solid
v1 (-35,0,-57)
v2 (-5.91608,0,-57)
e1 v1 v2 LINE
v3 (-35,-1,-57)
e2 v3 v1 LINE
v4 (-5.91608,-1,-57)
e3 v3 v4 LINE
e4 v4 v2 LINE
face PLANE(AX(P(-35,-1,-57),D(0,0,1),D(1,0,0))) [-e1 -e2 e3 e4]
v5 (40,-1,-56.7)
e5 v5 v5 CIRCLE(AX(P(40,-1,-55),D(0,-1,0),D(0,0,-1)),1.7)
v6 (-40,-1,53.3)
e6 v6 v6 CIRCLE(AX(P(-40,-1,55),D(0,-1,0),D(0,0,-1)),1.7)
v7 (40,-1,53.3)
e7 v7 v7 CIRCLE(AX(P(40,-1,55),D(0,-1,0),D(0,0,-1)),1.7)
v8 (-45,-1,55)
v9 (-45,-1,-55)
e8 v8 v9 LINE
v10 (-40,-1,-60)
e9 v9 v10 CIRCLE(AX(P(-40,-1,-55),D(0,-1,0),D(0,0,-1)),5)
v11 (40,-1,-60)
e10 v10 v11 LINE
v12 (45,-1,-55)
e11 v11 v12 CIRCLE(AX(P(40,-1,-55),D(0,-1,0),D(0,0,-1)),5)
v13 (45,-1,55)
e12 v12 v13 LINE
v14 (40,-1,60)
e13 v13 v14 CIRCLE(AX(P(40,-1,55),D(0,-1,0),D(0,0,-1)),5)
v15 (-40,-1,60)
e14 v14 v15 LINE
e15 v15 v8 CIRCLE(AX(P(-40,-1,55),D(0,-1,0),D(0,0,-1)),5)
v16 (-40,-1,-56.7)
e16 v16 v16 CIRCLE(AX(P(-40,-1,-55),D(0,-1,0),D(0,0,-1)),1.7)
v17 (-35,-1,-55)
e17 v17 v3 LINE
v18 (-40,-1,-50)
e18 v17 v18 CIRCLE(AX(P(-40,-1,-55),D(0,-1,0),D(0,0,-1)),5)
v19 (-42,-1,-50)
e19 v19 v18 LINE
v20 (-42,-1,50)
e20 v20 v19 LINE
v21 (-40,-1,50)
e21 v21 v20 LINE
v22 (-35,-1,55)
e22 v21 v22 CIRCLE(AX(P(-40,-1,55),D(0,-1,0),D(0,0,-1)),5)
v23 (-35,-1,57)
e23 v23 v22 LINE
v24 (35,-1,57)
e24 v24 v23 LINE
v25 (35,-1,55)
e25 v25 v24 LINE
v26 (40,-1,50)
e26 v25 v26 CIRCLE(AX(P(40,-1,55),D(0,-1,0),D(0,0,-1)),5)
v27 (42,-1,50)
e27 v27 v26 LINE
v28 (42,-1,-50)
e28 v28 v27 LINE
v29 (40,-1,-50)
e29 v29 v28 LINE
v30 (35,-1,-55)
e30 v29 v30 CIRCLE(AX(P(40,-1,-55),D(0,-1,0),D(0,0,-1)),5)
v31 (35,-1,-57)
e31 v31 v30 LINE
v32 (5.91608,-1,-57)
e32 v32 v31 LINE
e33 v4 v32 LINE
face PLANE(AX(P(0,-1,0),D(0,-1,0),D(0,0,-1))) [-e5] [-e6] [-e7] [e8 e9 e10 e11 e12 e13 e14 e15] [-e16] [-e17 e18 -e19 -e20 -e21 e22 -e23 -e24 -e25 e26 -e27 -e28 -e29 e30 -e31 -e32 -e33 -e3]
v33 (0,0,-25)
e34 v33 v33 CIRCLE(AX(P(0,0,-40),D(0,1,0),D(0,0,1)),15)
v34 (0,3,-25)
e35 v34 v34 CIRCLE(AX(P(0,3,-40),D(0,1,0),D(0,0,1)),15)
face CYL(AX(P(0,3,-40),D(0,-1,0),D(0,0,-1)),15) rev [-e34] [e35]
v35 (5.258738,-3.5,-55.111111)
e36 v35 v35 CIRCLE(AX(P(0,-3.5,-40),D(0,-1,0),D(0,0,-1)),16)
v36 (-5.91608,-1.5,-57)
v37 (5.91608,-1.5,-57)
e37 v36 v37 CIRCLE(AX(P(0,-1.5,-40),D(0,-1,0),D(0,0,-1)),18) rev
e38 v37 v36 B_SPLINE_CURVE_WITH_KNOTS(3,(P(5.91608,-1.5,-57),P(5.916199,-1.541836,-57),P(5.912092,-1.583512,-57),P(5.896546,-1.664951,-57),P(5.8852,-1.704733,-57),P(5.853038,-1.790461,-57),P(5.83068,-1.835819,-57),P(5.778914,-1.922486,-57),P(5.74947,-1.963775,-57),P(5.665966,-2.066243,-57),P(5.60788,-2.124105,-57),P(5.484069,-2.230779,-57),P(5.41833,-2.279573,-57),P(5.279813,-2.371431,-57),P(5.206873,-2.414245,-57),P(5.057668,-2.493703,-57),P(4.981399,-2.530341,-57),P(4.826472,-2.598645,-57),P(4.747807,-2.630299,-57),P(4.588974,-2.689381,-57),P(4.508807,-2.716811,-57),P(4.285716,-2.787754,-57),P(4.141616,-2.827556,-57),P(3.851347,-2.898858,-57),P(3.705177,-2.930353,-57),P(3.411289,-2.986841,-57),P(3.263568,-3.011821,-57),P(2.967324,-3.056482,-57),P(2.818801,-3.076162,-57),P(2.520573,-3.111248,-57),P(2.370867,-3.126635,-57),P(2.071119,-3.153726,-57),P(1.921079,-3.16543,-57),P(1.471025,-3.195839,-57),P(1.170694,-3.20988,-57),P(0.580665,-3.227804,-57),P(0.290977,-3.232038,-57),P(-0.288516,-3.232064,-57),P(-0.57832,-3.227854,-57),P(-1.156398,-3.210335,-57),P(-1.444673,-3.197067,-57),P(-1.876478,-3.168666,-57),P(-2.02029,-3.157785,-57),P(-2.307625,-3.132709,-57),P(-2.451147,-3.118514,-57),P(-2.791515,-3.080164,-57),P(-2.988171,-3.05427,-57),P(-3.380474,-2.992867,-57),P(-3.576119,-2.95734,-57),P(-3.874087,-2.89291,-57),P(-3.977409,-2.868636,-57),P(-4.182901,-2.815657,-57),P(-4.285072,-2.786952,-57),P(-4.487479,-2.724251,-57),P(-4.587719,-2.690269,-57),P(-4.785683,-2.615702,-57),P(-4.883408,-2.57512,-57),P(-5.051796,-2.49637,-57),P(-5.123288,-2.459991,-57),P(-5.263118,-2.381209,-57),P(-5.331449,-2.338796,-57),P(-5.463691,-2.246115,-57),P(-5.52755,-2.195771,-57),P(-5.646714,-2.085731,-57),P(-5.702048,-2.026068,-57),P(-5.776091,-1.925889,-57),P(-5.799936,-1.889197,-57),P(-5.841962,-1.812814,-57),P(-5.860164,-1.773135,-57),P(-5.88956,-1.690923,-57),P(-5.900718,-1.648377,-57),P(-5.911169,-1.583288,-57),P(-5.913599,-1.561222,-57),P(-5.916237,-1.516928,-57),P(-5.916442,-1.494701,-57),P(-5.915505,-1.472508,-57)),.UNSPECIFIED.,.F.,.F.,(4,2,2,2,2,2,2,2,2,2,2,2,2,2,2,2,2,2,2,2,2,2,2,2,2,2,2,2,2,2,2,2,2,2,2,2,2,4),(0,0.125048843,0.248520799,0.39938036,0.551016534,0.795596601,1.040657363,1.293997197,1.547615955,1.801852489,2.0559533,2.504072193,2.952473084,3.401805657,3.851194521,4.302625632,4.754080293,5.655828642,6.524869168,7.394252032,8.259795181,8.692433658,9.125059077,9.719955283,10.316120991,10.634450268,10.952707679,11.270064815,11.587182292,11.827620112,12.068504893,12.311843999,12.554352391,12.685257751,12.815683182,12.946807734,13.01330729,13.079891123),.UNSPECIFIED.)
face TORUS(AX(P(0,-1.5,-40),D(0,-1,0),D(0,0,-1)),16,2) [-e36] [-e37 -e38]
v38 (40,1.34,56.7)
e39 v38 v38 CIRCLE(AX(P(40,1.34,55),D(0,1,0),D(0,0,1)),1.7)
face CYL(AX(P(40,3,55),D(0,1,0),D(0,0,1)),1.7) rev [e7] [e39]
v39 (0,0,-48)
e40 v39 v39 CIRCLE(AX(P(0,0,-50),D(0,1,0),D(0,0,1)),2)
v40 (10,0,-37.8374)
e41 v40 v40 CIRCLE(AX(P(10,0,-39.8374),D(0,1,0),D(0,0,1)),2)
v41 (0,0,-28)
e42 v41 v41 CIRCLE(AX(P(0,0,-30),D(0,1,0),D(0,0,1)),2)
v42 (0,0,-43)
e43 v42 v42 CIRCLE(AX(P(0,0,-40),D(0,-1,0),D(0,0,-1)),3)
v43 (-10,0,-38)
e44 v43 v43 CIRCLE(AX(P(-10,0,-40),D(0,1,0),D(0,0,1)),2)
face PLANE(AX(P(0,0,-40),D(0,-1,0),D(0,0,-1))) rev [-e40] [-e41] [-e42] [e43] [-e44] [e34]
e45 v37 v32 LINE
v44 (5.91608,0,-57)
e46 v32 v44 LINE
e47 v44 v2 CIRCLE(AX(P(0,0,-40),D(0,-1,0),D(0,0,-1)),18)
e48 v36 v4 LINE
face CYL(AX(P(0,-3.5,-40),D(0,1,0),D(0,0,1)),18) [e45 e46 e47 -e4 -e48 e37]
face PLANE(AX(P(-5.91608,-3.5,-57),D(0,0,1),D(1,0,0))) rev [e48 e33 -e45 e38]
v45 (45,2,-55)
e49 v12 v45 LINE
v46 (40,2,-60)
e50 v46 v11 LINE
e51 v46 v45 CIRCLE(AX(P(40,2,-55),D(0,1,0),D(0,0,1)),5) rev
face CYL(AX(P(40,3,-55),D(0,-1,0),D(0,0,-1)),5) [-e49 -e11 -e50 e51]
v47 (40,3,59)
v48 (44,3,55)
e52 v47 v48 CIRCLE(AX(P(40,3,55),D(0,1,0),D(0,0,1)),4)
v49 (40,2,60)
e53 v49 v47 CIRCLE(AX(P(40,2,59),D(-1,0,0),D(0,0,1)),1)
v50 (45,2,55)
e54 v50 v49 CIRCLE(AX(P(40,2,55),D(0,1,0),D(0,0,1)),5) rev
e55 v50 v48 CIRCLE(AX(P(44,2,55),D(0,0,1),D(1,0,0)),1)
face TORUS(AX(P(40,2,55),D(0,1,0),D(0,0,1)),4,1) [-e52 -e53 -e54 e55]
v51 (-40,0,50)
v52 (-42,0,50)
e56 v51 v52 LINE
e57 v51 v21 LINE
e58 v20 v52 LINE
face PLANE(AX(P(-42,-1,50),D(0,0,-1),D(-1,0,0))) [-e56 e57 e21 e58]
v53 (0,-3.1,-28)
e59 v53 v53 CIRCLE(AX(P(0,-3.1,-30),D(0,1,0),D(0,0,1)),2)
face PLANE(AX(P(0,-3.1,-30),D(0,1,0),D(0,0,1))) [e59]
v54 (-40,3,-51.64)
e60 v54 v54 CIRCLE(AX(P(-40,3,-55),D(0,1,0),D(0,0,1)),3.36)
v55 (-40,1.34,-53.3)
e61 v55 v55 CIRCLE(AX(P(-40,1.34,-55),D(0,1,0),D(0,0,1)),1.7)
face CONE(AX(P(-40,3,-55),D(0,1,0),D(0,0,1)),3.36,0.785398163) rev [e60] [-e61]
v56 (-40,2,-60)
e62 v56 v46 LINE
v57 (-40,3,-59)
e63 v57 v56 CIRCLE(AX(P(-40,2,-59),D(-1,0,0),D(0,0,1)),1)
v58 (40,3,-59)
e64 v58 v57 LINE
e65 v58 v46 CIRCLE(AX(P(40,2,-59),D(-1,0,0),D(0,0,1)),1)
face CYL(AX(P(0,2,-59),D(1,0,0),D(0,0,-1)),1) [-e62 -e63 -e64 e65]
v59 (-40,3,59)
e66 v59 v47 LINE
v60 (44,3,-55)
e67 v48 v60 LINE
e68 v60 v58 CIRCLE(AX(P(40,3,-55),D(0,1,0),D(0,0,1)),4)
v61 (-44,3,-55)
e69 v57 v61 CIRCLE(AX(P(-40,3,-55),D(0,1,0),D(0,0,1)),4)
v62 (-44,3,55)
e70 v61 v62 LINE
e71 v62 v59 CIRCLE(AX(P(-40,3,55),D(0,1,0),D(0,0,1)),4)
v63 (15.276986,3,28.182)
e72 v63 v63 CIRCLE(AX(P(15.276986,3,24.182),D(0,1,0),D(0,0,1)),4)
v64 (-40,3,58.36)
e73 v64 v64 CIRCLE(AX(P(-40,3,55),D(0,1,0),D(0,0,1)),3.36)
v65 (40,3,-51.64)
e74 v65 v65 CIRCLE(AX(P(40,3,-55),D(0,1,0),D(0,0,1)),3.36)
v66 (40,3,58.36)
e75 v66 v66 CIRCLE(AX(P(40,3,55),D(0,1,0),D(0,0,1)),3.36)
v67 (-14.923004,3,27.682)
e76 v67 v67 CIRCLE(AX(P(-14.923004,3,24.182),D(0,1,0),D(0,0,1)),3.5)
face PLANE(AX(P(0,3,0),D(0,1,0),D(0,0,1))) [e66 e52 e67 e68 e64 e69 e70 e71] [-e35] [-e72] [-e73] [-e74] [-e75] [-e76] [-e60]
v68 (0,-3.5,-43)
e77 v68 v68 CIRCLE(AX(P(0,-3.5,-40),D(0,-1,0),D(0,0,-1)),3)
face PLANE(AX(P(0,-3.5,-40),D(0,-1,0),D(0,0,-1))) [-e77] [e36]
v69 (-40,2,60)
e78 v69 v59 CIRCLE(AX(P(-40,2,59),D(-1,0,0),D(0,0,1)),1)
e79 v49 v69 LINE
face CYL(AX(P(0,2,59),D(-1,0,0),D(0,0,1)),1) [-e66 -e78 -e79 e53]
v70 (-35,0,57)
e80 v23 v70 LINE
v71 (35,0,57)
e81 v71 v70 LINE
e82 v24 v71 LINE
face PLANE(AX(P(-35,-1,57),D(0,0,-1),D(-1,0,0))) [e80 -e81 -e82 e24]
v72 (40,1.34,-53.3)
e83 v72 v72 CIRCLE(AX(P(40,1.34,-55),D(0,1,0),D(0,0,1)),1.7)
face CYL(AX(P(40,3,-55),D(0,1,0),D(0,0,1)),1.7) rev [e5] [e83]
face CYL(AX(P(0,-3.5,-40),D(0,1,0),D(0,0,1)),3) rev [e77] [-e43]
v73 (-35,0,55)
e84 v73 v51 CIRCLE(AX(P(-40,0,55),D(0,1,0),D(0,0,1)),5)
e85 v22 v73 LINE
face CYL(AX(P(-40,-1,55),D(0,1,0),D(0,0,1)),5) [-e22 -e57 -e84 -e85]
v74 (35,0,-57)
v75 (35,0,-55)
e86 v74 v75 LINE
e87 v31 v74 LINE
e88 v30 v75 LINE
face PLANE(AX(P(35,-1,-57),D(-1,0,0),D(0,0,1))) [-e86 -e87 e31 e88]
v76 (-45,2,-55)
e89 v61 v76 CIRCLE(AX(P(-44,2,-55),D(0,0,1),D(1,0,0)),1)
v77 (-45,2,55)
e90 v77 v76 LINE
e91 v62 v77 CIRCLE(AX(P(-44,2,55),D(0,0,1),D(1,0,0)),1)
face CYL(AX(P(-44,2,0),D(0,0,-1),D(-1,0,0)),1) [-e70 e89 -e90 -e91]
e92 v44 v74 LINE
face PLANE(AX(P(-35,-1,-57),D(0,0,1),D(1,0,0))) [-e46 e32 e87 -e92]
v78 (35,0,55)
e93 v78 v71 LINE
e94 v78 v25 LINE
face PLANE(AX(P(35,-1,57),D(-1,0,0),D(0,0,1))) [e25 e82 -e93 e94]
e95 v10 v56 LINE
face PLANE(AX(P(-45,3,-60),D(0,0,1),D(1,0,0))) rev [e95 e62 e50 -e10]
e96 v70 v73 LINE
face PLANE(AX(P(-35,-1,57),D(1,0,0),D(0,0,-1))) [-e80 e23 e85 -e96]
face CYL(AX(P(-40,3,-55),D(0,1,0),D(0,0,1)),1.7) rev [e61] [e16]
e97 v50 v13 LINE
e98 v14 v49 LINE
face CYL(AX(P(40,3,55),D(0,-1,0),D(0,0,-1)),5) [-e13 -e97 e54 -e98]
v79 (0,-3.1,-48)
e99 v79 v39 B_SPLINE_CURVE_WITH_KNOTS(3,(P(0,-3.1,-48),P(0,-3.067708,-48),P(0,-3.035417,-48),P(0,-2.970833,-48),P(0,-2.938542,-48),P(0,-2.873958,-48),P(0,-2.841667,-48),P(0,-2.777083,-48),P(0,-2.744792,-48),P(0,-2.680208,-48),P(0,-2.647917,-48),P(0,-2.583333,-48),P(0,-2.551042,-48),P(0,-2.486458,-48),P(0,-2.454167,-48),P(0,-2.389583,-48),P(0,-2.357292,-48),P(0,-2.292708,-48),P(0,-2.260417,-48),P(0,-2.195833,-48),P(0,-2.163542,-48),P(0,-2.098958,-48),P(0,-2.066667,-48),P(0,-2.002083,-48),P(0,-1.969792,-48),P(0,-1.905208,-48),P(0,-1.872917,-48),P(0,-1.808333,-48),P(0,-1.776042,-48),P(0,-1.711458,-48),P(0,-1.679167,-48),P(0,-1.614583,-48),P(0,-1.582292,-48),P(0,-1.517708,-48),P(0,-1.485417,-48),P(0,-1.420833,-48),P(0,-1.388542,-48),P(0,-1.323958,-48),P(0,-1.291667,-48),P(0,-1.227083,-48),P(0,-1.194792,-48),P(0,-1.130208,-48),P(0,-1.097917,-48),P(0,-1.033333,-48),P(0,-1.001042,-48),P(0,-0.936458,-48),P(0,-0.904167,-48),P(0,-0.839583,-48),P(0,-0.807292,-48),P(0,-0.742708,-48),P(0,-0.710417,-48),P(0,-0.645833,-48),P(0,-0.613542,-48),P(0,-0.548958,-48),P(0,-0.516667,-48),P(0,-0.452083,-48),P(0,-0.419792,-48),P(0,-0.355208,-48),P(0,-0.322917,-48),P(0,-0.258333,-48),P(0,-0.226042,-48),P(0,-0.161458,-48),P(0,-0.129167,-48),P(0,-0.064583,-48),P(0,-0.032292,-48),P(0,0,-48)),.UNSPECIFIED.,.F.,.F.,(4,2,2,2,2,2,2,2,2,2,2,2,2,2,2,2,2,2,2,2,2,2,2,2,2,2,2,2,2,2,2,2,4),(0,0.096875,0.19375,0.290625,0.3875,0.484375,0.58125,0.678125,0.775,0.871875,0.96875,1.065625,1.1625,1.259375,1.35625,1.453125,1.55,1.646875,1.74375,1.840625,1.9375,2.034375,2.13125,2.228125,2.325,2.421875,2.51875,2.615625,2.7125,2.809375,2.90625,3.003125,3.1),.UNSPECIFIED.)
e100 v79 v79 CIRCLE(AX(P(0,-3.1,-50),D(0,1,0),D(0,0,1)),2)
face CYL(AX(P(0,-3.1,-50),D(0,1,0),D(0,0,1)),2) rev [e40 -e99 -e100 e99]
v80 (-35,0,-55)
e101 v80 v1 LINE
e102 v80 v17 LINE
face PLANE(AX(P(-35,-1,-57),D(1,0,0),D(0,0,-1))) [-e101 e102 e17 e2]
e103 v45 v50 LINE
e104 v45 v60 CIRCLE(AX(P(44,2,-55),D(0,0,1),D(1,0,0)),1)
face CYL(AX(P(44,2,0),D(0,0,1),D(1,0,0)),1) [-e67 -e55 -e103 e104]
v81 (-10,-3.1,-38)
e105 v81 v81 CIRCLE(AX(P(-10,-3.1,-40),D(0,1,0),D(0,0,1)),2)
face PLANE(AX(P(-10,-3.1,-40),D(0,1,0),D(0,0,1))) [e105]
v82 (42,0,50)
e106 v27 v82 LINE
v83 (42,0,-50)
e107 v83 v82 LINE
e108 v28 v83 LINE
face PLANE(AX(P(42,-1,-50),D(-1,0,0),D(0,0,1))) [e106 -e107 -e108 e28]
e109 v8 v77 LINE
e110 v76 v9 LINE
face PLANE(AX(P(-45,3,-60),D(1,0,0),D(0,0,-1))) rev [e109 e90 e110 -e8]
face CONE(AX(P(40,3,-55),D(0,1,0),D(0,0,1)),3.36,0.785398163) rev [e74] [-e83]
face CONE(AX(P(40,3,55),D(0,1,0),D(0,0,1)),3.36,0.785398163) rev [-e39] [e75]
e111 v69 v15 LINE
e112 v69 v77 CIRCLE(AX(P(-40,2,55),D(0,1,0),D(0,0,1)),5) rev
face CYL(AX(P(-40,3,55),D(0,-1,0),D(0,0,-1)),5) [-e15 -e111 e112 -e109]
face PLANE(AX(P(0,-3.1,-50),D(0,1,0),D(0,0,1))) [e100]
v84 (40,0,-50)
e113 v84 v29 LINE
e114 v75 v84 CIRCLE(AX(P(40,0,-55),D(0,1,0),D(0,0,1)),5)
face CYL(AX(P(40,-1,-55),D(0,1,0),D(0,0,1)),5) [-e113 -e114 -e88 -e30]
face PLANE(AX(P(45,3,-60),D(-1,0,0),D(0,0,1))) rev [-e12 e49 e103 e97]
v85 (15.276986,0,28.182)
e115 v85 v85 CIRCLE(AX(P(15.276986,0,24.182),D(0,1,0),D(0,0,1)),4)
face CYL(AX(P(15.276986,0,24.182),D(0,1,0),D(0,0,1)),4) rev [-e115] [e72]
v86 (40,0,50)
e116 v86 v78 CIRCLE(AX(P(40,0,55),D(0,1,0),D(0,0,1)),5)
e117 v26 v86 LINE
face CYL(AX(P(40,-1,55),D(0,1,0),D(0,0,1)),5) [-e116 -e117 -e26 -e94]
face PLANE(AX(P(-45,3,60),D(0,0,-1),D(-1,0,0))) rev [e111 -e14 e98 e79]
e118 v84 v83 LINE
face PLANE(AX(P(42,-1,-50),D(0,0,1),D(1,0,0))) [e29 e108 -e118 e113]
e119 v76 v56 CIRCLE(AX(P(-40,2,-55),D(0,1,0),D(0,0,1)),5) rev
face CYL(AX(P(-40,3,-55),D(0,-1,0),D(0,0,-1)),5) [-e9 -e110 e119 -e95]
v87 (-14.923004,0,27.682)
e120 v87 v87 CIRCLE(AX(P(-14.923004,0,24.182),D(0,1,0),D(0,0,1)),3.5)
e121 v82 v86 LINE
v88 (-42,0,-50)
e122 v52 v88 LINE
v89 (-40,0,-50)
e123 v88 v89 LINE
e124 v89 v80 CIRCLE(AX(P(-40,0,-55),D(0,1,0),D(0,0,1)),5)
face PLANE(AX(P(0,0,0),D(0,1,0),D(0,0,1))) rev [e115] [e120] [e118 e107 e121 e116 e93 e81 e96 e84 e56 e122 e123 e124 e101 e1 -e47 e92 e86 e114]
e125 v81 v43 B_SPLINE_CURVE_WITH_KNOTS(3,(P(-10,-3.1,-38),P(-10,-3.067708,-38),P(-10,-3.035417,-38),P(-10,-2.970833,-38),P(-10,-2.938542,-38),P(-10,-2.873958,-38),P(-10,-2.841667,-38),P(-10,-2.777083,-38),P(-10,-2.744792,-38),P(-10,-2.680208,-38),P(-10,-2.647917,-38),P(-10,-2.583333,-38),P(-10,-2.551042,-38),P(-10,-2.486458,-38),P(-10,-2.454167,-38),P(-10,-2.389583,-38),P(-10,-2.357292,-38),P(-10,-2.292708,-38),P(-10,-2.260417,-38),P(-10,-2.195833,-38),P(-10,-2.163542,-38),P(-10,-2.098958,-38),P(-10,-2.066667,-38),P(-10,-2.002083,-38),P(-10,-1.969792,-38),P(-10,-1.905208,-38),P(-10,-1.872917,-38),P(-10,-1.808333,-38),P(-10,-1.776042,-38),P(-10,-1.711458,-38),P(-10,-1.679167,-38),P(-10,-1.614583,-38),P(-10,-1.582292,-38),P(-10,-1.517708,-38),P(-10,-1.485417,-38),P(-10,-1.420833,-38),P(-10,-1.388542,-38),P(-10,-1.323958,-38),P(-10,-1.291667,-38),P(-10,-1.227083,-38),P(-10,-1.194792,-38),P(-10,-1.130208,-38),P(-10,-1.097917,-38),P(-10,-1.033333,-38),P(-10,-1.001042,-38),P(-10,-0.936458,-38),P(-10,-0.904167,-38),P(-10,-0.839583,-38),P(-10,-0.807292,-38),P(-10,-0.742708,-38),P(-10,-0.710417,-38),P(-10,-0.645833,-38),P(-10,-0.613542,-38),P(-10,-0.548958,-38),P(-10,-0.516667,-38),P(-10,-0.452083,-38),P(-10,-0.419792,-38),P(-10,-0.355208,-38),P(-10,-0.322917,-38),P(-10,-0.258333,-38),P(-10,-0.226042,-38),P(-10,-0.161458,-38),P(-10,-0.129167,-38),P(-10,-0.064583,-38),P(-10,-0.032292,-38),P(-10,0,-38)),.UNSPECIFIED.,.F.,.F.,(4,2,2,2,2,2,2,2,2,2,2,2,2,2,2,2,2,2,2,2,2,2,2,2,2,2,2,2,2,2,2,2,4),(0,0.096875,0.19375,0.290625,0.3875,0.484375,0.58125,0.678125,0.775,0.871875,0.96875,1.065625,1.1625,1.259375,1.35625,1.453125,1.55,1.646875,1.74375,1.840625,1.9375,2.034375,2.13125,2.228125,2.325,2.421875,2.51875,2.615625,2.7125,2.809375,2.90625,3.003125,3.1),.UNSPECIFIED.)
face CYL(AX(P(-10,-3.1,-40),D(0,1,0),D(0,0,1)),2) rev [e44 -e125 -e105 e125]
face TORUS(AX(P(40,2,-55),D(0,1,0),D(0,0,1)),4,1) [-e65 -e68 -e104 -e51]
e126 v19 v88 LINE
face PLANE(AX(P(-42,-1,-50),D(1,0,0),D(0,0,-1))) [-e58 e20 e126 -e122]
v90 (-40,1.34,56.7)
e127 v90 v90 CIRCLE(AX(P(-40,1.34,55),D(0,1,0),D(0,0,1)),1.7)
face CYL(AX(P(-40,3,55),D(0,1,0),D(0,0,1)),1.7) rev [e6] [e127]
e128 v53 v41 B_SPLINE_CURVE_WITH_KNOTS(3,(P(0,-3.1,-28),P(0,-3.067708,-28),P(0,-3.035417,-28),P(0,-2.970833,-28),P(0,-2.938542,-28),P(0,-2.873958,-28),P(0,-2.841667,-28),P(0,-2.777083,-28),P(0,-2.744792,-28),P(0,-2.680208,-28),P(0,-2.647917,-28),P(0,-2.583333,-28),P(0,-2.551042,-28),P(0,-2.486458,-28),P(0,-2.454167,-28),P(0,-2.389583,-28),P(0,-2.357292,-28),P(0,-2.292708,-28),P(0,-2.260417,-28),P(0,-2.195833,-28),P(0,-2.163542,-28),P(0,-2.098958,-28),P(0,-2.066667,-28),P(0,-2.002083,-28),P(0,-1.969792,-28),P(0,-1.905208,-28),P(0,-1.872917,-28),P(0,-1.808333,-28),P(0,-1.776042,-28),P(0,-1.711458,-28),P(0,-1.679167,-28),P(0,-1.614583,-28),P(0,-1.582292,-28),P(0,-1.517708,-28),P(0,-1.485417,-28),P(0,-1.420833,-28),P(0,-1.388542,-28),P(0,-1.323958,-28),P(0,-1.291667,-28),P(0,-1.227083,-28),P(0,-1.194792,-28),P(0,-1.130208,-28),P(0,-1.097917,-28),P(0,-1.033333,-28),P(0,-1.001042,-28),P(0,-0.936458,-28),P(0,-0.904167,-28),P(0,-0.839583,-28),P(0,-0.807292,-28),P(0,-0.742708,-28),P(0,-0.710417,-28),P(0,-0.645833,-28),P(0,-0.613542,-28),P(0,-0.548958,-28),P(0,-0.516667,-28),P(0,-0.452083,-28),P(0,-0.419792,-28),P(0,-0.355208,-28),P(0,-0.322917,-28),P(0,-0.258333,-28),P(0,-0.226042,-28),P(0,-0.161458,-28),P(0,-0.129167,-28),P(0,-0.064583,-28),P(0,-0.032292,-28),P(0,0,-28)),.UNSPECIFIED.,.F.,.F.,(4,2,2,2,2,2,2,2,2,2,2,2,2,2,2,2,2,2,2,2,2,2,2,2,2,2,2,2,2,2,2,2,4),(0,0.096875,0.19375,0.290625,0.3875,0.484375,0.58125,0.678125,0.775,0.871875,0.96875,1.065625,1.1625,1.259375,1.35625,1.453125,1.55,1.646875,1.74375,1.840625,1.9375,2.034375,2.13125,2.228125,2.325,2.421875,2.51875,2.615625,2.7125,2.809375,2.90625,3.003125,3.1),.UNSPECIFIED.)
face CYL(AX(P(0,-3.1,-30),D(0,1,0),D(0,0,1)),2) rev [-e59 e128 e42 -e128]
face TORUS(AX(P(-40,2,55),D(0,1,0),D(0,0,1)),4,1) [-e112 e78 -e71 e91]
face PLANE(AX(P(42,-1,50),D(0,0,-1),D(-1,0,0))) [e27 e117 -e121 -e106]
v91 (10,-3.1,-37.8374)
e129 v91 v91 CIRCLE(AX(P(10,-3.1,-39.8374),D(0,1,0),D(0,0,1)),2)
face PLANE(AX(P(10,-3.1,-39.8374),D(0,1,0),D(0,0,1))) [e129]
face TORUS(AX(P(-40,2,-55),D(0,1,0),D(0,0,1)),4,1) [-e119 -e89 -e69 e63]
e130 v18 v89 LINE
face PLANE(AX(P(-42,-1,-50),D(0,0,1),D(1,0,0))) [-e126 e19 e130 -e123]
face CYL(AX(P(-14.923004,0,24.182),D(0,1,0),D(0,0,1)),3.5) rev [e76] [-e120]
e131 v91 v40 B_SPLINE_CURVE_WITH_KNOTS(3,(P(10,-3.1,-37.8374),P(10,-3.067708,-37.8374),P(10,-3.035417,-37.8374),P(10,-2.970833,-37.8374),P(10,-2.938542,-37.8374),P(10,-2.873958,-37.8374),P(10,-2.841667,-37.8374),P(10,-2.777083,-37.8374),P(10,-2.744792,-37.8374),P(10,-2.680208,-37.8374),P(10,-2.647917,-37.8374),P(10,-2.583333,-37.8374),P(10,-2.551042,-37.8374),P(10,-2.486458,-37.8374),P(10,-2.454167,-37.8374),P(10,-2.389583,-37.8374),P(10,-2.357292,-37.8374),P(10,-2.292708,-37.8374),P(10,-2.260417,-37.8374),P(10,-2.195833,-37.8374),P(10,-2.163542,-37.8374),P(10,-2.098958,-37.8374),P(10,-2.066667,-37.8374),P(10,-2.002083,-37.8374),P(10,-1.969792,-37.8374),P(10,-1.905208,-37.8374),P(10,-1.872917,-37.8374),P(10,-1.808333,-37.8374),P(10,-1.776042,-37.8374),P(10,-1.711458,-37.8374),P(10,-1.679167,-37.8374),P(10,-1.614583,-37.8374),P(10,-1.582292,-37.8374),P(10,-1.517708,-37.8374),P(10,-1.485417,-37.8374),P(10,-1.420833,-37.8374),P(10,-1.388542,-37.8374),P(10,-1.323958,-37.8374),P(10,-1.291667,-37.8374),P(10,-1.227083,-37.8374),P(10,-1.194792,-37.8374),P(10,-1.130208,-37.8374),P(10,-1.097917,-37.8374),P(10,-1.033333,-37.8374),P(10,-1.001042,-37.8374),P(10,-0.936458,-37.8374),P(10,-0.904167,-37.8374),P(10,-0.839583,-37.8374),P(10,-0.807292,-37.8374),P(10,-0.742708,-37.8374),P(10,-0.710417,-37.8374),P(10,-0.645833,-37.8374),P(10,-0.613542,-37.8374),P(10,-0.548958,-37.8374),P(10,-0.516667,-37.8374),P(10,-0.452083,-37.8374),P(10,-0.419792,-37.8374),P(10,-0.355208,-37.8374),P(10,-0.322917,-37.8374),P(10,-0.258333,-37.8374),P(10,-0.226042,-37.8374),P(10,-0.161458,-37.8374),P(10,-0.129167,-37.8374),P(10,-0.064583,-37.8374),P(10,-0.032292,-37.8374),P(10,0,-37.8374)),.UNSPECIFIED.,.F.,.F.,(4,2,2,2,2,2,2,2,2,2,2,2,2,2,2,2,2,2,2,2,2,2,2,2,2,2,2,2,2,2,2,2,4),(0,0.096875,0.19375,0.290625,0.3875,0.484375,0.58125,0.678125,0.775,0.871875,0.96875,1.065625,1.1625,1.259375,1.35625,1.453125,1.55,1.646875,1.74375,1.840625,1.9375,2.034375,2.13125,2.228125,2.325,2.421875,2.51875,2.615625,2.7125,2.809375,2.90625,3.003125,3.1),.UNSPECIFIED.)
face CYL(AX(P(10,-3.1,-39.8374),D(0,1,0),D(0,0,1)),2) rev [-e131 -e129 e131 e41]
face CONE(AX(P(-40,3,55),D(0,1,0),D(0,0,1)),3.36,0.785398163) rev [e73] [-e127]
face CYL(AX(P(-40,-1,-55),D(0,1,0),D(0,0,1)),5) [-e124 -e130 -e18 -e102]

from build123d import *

# Parameters (mm, degrees)
SKETCH_2_W                   = 90
SKETCH_2_H                   = 120
SKETCH_2_R                   = 15
EXTRUDE_1_DEPTH              = 3
SKETCH_3_W                   = 90
SKETCH_3_H                   = 120
EXTRUDE_2_DEPTH              = 1
SKETCH_8_R                   = 3
EXTRUDE_5_DEPTH              = 3.5
SKETCH_10_R                  = 2
CUT_EXTRUDE_2_DEPTH          = 3.1
HOLE_WIZARD_M3_3_D           = 3.4
HOLE_WIZARD_M3_3_CSINK_D     = 6.72
HOLE_WIZARD_M3_3_CSINK_ANGLE = 90
FILLET_2_R                   = 5
FILLET_3_R                   = 5
FILLET_4_R                   = 5
FILLET_5_R                   = 5
FILLET_6_R                   = 5
FILLET_7_R                   = 5
FILLET_8_R                   = 5
FILLET_9_R                   = 5
FILLET_10_R                  = 1
SKETCH_16_R                  = 3.5
SKETCH_16_R_2                = 4
CUT_EXTRUDE_3_DEPTH          = 3


with BuildPart() as part:
    # 草图2 → 凸台-拉伸1 (new body)
    with BuildSketch(Plane(origin=(0, 0, 0), x_dir=(1, 0, 0), z_dir=(0, 1, 0))):
        Rectangle(SKETCH_2_W, SKETCH_2_H)
        with Locations(Location((0, 40, 0), (0, 0, 270))):
            Circle(SKETCH_2_R, mode=Mode.SUBTRACT)
    extrude(amount=EXTRUDE_1_DEPTH)



with BuildPart() as body_2:
    # 草图3 → 凸台-拉伸2 (new body)
    with BuildSketch(Plane.XZ):
        Rectangle(SKETCH_3_W, SKETCH_3_H)
        Polygon((-42, -50), (-42, 50), (-35, 50), (-35, 57), (35, 57), (35, 50), (42, 50), (42, -50), (35, -50), (35, -57), (-35, -57), (-35, -50), align=None, mode=Mode.SUBTRACT)
    extrude(amount=EXTRUDE_2_DEPTH)


with BuildPart() as part_1:
    add(part.part)

    add(body_2.part)  # 凸台-拉伸5 merges body 2
    # 草图8 → 凸台-拉伸5 (add)
    with BuildSketch(Plane.XZ):
        with BuildLine():
            Line((-5.916079783, -57), (5.916079783, -57))
            ThreePointArc((5.916079783, -57), (0, -22), (-5.916079783, -57))
        make_face()
        with Locations(Location((0, -40, 0), (0, 0, 270))):
            Circle(SKETCH_8_R, mode=Mode.SUBTRACT)
    extrude(amount=EXTRUDE_5_DEPTH)

    # 草图10 → 切除-拉伸2 (cut)
    with BuildSketch(Plane(origin=(0, 0, 0), x_dir=(1, 0, 0), z_dir=(0, 1, 0))):
        with Locations(Location((0, 30, 0), (0, 0, 270))):
            Circle(SKETCH_10_R)
        with Locations(Location((10, 39.837399549, 0), (0, 0, 270))):
            Circle(SKETCH_10_R)
        with Locations(Location((0, 50, 0), (0, 0, 270))):
            Circle(SKETCH_10_R)
        with Locations(Location((-10, 40, 0), (0, 0, 270))):
            Circle(SKETCH_10_R)
    extrude(amount=-CUT_EXTRUDE_2_DEPTH, mode=Mode.SUBTRACT)

    # M3 六角凹锥坑螺钉的锥形沉头孔3 (through all)
    with Locations(Plane(origin=(0, 3, 0), x_dir=(1, 0, 0), z_dir=(0, 1, 0))):
        with Locations((-40, -55), (-40, 55), (40, 55), (40, -55)):
            CounterSinkHole(HOLE_WIZARD_M3_3_D / 2, HOLE_WIZARD_M3_3_CSINK_D / 2, counter_sink_angle=HOLE_WIZARD_M3_3_CSINK_ANGLE)

    # 圆角2
    fillet_2_edges = [part_1.edges().sort_by_distance(p)[0] for p in [
        (35, -0.5, -50),
    ]]
    fillet(fillet_2_edges, radius=FILLET_2_R)

    # 圆角3
    fillet_3_edges = [part_1.edges().sort_by_distance(p)[0] for p in [
        (35, -0.5, 50),
    ]]
    fillet(fillet_3_edges, radius=FILLET_3_R)

    # 圆角4
    fillet_4_edges = [part_1.edges().sort_by_distance(p)[0] for p in [
        (-35, -0.5, 50),
    ]]
    fillet(fillet_4_edges, radius=FILLET_4_R)

    # 圆角5
    fillet_5_edges = [part_1.edges().sort_by_distance(p)[0] for p in [
        (-35, -0.5, -50),
    ]]
    fillet(fillet_5_edges, radius=FILLET_5_R)

    # 圆角6
    fillet_6_edges = [part_1.edges().sort_by_distance(p)[0] for p in [
        (-45, 1, -60),
    ]]
    fillet(fillet_6_edges, radius=FILLET_6_R)

    # 圆角7
    fillet_7_edges = [part_1.edges().sort_by_distance(p)[0] for p in [
        (45, 1, -60),
    ]]
    fillet(fillet_7_edges, radius=FILLET_7_R)

    # 圆角8
    fillet_8_edges = [part_1.edges().sort_by_distance(p)[0] for p in [
        (45, 1, 60),
    ]]
    fillet(fillet_8_edges, radius=FILLET_8_R)

    # 圆角9
    fillet_9_edges = [part_1.edges().sort_by_distance(p)[0] for p in [
        (-45, 1, 60),
    ]]
    fillet(fillet_9_edges, radius=FILLET_9_R)

    # 圆角10
    fillet_10_edges = [part_1.edges().sort_by_distance(p)[0] for p in [
        (-45, 3, 0),
        (-43.535533906, 3, -58.535533906),
        (0, 3, -60),
        (43.535533906, 3, -58.535533906),
        (45, 3, 0),
        (43.535533906, 3, 58.535533906),
        (0, 3, 60),
        (-43.535533906, 3, 58.535533906),
    ]]
    fillet(fillet_10_edges, radius=FILLET_10_R)

    # 圆角11: read off the stored shape, not the designer's step
    # 圆角11 outline → 圆角11 (revolve, cut)
    with BuildSketch(Plane.XY.offset(-40)):
        with BuildLine():
            Line((18, -3.5), (18, -1.5))
            ThreePointArc((18, -1.5), (17.414213562, -2.914213562), (16, -3.5))
            Line((16, -3.5), (18, -3.5))
        make_face()
    revolve(axis=Axis((0, 0, -40), (0, 1, 0)), mode=Mode.SUBTRACT)

    # 草图16 → 切除-拉伸3 (cut)
    with BuildSketch(Plane(origin=(0, 3, 0), x_dir=(1, 0, 0), z_dir=(0, 1, 0))):
        with Locations(Location((-14.923003693, -24.181999786, 0), (0, 0, 270))):
            Circle(SKETCH_16_R)
        with Locations(Location((15.276985626, -24.181999786, 0), (0, 0, 270))):
            Circle(SKETCH_16_R_2)
    extrude(amount=-CUT_EXTRUDE_3_DEPTH, mode=Mode.SUBTRACT)


solid = part_1.part
